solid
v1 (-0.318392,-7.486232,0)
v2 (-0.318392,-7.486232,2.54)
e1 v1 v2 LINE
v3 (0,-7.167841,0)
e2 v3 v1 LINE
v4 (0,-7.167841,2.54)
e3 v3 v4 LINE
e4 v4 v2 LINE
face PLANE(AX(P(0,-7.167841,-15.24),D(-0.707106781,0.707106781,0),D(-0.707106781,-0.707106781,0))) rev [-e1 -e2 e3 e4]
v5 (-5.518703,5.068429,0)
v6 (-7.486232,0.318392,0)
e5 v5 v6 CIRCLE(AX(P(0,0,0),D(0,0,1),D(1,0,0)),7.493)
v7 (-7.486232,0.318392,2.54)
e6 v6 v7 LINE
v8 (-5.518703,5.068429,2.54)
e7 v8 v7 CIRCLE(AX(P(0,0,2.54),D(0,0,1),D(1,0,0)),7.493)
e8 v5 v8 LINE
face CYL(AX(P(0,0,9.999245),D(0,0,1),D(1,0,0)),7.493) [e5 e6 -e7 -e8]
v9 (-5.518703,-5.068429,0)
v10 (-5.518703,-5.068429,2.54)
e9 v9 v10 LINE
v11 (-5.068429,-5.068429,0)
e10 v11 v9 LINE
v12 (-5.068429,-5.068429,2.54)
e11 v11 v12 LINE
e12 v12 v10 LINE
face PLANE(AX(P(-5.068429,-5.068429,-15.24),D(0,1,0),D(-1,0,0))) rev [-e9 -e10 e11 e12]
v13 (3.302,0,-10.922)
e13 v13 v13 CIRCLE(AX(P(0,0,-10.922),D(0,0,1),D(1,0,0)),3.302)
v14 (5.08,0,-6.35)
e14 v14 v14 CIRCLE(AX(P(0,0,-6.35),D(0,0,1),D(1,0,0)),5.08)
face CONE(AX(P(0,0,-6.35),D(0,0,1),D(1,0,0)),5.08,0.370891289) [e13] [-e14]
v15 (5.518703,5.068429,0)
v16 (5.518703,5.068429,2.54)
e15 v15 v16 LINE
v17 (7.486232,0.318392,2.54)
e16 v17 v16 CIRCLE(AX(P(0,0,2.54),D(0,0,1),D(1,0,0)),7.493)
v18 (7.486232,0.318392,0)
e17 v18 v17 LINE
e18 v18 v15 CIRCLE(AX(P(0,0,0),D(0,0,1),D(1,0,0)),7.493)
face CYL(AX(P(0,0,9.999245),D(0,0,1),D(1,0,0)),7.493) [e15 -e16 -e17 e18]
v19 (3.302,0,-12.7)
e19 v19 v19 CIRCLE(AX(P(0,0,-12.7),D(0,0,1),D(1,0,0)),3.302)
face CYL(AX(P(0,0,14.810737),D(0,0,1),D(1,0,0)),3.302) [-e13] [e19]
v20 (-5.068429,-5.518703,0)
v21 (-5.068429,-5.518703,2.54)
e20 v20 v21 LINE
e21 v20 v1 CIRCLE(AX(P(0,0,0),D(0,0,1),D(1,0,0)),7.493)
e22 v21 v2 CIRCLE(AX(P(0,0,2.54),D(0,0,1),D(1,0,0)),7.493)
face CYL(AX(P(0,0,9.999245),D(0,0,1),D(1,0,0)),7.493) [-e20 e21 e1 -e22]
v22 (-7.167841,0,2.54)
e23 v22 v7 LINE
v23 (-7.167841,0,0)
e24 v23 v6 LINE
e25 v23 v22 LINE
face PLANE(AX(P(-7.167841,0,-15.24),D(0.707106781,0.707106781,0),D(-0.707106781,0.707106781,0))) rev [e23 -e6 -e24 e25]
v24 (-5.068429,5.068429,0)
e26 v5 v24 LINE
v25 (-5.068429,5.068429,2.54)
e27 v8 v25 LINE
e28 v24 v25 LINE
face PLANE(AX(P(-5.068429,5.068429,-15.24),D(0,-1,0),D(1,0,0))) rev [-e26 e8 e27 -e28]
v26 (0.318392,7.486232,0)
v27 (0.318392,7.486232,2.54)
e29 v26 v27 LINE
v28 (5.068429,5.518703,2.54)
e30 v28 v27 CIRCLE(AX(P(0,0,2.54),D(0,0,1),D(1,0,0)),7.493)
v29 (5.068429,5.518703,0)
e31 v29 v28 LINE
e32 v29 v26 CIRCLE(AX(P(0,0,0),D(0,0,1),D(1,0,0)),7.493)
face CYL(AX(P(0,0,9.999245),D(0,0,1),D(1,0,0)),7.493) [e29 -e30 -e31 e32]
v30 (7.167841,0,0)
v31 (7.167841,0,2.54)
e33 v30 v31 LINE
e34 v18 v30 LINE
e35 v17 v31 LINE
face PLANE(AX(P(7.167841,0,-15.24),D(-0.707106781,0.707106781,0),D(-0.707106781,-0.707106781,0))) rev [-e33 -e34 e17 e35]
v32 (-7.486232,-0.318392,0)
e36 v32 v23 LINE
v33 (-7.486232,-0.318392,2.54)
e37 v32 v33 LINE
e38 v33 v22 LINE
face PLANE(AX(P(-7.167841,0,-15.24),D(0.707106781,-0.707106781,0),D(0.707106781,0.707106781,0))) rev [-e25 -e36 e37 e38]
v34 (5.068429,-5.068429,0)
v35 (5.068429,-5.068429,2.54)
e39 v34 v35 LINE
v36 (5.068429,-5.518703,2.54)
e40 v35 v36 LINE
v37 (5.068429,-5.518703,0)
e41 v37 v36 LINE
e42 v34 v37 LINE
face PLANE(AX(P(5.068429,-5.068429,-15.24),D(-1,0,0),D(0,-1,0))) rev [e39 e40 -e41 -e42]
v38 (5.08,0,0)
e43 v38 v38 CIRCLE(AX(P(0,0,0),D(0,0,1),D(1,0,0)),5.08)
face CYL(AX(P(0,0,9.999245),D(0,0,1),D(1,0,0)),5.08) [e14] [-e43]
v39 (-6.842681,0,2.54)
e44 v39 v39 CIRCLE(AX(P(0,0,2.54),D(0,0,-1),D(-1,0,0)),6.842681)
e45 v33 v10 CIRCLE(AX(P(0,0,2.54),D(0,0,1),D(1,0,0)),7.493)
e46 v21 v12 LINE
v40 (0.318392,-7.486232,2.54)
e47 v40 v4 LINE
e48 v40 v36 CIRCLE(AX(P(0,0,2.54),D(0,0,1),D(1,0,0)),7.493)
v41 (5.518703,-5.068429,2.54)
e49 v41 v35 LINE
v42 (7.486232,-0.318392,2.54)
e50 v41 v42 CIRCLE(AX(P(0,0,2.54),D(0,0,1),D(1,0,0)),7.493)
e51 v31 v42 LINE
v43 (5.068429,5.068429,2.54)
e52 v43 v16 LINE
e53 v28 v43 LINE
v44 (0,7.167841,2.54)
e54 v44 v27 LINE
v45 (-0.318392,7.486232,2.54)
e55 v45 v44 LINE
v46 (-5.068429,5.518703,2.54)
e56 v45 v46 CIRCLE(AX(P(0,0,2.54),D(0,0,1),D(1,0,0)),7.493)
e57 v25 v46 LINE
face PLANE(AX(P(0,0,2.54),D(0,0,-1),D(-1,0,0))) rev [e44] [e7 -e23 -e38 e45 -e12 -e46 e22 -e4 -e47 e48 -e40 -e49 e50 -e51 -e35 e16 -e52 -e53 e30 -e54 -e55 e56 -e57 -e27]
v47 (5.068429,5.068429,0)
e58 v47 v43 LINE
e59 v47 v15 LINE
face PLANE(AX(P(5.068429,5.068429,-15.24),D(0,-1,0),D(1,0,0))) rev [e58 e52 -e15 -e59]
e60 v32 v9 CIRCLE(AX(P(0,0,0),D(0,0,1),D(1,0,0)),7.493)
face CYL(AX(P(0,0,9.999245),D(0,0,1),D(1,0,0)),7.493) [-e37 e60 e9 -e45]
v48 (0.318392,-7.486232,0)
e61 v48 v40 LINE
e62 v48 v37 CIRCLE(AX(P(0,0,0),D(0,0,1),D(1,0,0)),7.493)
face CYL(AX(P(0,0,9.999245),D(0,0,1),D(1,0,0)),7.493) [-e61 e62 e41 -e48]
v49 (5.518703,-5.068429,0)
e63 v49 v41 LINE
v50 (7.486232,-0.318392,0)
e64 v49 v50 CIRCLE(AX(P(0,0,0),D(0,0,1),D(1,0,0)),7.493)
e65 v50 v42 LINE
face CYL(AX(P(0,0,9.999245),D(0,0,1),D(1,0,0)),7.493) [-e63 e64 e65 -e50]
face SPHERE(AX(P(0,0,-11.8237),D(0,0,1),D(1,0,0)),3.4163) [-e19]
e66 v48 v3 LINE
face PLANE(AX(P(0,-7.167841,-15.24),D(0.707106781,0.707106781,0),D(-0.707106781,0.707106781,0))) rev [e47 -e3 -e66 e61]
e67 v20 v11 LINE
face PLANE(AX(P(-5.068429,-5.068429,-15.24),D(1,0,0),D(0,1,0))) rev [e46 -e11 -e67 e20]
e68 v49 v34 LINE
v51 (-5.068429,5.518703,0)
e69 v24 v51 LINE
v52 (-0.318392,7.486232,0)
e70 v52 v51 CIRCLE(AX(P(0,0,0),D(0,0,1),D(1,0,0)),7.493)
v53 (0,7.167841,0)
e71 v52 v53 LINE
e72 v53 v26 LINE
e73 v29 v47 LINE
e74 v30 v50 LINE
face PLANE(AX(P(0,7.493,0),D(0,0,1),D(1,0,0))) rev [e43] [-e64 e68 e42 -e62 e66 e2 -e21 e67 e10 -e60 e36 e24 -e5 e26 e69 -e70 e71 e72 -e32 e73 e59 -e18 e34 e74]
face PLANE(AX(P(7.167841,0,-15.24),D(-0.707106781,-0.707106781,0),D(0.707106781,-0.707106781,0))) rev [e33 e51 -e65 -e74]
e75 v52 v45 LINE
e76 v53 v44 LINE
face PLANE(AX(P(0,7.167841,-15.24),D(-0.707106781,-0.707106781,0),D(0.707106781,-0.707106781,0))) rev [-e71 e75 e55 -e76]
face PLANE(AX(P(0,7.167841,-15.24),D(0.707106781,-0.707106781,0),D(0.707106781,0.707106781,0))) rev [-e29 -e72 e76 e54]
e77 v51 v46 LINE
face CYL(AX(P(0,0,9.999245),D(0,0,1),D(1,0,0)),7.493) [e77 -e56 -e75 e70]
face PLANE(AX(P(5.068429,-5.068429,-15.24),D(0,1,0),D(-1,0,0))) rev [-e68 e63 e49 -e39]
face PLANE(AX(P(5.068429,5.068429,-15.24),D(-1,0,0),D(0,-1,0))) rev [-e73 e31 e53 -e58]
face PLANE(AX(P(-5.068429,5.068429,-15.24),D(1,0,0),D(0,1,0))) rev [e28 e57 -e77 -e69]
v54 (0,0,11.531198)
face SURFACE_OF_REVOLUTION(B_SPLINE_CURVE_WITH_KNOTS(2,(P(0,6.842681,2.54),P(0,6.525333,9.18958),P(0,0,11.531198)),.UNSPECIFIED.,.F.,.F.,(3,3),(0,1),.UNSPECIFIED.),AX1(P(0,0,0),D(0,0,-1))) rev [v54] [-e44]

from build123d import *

# Parameters (mm, degrees)
DOME1_FACE_RADIUS = 3.302
DOME1_HEIGHT      = 2.54
SEEDCUT_DEPTH     = 21.698272826
CIRPATTERN1_COUNT = 8


# Read off the part's stored shape, not the designer's step: Cut-Revolve-Thin3
with BuildPart() as part:
    # Sketch1 → Revolve1 (revolve)
    with BuildSketch(Plane(origin=(0, 0, 0), x_dir=(0, 0, -1), z_dir=(1, 0, 0)), mode=Mode.PRIVATE) as revolve1_sk:
        Polygon((-2.54, 0), (-2.54, 7.493), (0, 7.493), (0, 5.08), (12.7, 5.08), (12.7, 0), align=None)
    revolve(revolve1_sk.sketch.rotate(Axis((0, 0, 9.999244512), (0, 0, -1)), 90), axis=Axis((0, 0, 9.999244512), (0, 0, -1)))

    # Sketch2 → Revolve2 (revolve)
    with BuildSketch(Plane(origin=(0, 0, 0), x_dir=(0, 0, -1), z_dir=(1, 0, 0))):
        with BuildLine():
            Line((-11.531198063, 0), (-2.54, 0))
            Line((-2.54, 0), (-2.54, 6.84268102))
            add(Edge.make_bspline(
                [(-2.54, 6.84268102), (-9.189579749, 6.525332983), (-11.531198063, 0)],
                knots=[0, 0, 0, 1, 1, 1], degree=2))
        make_face()
    revolve(axis=Axis((0, 0, 9.999244512), (0, 0, 1)))

    # Cut-Revolve-Thin3 outline → Cut-Revolve-Thin3 (revolve, cut)
    with BuildSketch(Plane.XZ):
        Polygon((3.302, -10.922), (3.302, -12.7), (5.08, -12.7), (5.08, -6.35), align=None)
    revolve(axis=Axis((0, 0, 0), (0, 0, 1)), mode=Mode.SUBTRACT)

    # Dome1: a dome of height H over a round flat face of radius A is a cap of a sphere of radius (A * A + H * H) / (2 * H)
    dome1_r = (DOME1_FACE_RADIUS * DOME1_FACE_RADIUS + DOME1_HEIGHT * DOME1_HEIGHT) / (2 * DOME1_HEIGHT)
    dome1_base = Plane((0, 0, -12.7), z_dir=(0, 0, -1))
    with Locations(dome1_base.offset(DOME1_HEIGHT - dome1_r)):
        dome1_ball = Sphere(dome1_r, mode=Mode.PRIVATE)
    add(split(dome1_ball, bisect_by=dome1_base, keep=Keep.TOP, mode=Mode.PRIVATE))

    # Sketch4 → SeedCut (cut, through all)
    with BuildSketch(Plane.XY.offset(2.54)):
        with BuildLine():
            Line((0, 7.16784051), (-0.318391894, 7.486232404))
            ThreePointArc((-0.318391894, 7.486232404), (0, 7.493), (0.318391894, 7.486232404))
            Line((0.318391894, 7.486232404), (0, 7.16784051))
        make_face()
    seedcut = extrude(amount=-SEEDCUT_DEPTH, mode=Mode.SUBTRACT)

    # CirPattern1: SeedCut ×8 about axis
    cirpattern1_axis = Axis((0, 0, 0), (0, 0, 1))
    for i in range(1, CIRPATTERN1_COUNT):
        add(seedcut.rotate(cirpattern1_axis, i * 360 / CIRPATTERN1_COUNT), mode=Mode.SUBTRACT)


solid = part.part
